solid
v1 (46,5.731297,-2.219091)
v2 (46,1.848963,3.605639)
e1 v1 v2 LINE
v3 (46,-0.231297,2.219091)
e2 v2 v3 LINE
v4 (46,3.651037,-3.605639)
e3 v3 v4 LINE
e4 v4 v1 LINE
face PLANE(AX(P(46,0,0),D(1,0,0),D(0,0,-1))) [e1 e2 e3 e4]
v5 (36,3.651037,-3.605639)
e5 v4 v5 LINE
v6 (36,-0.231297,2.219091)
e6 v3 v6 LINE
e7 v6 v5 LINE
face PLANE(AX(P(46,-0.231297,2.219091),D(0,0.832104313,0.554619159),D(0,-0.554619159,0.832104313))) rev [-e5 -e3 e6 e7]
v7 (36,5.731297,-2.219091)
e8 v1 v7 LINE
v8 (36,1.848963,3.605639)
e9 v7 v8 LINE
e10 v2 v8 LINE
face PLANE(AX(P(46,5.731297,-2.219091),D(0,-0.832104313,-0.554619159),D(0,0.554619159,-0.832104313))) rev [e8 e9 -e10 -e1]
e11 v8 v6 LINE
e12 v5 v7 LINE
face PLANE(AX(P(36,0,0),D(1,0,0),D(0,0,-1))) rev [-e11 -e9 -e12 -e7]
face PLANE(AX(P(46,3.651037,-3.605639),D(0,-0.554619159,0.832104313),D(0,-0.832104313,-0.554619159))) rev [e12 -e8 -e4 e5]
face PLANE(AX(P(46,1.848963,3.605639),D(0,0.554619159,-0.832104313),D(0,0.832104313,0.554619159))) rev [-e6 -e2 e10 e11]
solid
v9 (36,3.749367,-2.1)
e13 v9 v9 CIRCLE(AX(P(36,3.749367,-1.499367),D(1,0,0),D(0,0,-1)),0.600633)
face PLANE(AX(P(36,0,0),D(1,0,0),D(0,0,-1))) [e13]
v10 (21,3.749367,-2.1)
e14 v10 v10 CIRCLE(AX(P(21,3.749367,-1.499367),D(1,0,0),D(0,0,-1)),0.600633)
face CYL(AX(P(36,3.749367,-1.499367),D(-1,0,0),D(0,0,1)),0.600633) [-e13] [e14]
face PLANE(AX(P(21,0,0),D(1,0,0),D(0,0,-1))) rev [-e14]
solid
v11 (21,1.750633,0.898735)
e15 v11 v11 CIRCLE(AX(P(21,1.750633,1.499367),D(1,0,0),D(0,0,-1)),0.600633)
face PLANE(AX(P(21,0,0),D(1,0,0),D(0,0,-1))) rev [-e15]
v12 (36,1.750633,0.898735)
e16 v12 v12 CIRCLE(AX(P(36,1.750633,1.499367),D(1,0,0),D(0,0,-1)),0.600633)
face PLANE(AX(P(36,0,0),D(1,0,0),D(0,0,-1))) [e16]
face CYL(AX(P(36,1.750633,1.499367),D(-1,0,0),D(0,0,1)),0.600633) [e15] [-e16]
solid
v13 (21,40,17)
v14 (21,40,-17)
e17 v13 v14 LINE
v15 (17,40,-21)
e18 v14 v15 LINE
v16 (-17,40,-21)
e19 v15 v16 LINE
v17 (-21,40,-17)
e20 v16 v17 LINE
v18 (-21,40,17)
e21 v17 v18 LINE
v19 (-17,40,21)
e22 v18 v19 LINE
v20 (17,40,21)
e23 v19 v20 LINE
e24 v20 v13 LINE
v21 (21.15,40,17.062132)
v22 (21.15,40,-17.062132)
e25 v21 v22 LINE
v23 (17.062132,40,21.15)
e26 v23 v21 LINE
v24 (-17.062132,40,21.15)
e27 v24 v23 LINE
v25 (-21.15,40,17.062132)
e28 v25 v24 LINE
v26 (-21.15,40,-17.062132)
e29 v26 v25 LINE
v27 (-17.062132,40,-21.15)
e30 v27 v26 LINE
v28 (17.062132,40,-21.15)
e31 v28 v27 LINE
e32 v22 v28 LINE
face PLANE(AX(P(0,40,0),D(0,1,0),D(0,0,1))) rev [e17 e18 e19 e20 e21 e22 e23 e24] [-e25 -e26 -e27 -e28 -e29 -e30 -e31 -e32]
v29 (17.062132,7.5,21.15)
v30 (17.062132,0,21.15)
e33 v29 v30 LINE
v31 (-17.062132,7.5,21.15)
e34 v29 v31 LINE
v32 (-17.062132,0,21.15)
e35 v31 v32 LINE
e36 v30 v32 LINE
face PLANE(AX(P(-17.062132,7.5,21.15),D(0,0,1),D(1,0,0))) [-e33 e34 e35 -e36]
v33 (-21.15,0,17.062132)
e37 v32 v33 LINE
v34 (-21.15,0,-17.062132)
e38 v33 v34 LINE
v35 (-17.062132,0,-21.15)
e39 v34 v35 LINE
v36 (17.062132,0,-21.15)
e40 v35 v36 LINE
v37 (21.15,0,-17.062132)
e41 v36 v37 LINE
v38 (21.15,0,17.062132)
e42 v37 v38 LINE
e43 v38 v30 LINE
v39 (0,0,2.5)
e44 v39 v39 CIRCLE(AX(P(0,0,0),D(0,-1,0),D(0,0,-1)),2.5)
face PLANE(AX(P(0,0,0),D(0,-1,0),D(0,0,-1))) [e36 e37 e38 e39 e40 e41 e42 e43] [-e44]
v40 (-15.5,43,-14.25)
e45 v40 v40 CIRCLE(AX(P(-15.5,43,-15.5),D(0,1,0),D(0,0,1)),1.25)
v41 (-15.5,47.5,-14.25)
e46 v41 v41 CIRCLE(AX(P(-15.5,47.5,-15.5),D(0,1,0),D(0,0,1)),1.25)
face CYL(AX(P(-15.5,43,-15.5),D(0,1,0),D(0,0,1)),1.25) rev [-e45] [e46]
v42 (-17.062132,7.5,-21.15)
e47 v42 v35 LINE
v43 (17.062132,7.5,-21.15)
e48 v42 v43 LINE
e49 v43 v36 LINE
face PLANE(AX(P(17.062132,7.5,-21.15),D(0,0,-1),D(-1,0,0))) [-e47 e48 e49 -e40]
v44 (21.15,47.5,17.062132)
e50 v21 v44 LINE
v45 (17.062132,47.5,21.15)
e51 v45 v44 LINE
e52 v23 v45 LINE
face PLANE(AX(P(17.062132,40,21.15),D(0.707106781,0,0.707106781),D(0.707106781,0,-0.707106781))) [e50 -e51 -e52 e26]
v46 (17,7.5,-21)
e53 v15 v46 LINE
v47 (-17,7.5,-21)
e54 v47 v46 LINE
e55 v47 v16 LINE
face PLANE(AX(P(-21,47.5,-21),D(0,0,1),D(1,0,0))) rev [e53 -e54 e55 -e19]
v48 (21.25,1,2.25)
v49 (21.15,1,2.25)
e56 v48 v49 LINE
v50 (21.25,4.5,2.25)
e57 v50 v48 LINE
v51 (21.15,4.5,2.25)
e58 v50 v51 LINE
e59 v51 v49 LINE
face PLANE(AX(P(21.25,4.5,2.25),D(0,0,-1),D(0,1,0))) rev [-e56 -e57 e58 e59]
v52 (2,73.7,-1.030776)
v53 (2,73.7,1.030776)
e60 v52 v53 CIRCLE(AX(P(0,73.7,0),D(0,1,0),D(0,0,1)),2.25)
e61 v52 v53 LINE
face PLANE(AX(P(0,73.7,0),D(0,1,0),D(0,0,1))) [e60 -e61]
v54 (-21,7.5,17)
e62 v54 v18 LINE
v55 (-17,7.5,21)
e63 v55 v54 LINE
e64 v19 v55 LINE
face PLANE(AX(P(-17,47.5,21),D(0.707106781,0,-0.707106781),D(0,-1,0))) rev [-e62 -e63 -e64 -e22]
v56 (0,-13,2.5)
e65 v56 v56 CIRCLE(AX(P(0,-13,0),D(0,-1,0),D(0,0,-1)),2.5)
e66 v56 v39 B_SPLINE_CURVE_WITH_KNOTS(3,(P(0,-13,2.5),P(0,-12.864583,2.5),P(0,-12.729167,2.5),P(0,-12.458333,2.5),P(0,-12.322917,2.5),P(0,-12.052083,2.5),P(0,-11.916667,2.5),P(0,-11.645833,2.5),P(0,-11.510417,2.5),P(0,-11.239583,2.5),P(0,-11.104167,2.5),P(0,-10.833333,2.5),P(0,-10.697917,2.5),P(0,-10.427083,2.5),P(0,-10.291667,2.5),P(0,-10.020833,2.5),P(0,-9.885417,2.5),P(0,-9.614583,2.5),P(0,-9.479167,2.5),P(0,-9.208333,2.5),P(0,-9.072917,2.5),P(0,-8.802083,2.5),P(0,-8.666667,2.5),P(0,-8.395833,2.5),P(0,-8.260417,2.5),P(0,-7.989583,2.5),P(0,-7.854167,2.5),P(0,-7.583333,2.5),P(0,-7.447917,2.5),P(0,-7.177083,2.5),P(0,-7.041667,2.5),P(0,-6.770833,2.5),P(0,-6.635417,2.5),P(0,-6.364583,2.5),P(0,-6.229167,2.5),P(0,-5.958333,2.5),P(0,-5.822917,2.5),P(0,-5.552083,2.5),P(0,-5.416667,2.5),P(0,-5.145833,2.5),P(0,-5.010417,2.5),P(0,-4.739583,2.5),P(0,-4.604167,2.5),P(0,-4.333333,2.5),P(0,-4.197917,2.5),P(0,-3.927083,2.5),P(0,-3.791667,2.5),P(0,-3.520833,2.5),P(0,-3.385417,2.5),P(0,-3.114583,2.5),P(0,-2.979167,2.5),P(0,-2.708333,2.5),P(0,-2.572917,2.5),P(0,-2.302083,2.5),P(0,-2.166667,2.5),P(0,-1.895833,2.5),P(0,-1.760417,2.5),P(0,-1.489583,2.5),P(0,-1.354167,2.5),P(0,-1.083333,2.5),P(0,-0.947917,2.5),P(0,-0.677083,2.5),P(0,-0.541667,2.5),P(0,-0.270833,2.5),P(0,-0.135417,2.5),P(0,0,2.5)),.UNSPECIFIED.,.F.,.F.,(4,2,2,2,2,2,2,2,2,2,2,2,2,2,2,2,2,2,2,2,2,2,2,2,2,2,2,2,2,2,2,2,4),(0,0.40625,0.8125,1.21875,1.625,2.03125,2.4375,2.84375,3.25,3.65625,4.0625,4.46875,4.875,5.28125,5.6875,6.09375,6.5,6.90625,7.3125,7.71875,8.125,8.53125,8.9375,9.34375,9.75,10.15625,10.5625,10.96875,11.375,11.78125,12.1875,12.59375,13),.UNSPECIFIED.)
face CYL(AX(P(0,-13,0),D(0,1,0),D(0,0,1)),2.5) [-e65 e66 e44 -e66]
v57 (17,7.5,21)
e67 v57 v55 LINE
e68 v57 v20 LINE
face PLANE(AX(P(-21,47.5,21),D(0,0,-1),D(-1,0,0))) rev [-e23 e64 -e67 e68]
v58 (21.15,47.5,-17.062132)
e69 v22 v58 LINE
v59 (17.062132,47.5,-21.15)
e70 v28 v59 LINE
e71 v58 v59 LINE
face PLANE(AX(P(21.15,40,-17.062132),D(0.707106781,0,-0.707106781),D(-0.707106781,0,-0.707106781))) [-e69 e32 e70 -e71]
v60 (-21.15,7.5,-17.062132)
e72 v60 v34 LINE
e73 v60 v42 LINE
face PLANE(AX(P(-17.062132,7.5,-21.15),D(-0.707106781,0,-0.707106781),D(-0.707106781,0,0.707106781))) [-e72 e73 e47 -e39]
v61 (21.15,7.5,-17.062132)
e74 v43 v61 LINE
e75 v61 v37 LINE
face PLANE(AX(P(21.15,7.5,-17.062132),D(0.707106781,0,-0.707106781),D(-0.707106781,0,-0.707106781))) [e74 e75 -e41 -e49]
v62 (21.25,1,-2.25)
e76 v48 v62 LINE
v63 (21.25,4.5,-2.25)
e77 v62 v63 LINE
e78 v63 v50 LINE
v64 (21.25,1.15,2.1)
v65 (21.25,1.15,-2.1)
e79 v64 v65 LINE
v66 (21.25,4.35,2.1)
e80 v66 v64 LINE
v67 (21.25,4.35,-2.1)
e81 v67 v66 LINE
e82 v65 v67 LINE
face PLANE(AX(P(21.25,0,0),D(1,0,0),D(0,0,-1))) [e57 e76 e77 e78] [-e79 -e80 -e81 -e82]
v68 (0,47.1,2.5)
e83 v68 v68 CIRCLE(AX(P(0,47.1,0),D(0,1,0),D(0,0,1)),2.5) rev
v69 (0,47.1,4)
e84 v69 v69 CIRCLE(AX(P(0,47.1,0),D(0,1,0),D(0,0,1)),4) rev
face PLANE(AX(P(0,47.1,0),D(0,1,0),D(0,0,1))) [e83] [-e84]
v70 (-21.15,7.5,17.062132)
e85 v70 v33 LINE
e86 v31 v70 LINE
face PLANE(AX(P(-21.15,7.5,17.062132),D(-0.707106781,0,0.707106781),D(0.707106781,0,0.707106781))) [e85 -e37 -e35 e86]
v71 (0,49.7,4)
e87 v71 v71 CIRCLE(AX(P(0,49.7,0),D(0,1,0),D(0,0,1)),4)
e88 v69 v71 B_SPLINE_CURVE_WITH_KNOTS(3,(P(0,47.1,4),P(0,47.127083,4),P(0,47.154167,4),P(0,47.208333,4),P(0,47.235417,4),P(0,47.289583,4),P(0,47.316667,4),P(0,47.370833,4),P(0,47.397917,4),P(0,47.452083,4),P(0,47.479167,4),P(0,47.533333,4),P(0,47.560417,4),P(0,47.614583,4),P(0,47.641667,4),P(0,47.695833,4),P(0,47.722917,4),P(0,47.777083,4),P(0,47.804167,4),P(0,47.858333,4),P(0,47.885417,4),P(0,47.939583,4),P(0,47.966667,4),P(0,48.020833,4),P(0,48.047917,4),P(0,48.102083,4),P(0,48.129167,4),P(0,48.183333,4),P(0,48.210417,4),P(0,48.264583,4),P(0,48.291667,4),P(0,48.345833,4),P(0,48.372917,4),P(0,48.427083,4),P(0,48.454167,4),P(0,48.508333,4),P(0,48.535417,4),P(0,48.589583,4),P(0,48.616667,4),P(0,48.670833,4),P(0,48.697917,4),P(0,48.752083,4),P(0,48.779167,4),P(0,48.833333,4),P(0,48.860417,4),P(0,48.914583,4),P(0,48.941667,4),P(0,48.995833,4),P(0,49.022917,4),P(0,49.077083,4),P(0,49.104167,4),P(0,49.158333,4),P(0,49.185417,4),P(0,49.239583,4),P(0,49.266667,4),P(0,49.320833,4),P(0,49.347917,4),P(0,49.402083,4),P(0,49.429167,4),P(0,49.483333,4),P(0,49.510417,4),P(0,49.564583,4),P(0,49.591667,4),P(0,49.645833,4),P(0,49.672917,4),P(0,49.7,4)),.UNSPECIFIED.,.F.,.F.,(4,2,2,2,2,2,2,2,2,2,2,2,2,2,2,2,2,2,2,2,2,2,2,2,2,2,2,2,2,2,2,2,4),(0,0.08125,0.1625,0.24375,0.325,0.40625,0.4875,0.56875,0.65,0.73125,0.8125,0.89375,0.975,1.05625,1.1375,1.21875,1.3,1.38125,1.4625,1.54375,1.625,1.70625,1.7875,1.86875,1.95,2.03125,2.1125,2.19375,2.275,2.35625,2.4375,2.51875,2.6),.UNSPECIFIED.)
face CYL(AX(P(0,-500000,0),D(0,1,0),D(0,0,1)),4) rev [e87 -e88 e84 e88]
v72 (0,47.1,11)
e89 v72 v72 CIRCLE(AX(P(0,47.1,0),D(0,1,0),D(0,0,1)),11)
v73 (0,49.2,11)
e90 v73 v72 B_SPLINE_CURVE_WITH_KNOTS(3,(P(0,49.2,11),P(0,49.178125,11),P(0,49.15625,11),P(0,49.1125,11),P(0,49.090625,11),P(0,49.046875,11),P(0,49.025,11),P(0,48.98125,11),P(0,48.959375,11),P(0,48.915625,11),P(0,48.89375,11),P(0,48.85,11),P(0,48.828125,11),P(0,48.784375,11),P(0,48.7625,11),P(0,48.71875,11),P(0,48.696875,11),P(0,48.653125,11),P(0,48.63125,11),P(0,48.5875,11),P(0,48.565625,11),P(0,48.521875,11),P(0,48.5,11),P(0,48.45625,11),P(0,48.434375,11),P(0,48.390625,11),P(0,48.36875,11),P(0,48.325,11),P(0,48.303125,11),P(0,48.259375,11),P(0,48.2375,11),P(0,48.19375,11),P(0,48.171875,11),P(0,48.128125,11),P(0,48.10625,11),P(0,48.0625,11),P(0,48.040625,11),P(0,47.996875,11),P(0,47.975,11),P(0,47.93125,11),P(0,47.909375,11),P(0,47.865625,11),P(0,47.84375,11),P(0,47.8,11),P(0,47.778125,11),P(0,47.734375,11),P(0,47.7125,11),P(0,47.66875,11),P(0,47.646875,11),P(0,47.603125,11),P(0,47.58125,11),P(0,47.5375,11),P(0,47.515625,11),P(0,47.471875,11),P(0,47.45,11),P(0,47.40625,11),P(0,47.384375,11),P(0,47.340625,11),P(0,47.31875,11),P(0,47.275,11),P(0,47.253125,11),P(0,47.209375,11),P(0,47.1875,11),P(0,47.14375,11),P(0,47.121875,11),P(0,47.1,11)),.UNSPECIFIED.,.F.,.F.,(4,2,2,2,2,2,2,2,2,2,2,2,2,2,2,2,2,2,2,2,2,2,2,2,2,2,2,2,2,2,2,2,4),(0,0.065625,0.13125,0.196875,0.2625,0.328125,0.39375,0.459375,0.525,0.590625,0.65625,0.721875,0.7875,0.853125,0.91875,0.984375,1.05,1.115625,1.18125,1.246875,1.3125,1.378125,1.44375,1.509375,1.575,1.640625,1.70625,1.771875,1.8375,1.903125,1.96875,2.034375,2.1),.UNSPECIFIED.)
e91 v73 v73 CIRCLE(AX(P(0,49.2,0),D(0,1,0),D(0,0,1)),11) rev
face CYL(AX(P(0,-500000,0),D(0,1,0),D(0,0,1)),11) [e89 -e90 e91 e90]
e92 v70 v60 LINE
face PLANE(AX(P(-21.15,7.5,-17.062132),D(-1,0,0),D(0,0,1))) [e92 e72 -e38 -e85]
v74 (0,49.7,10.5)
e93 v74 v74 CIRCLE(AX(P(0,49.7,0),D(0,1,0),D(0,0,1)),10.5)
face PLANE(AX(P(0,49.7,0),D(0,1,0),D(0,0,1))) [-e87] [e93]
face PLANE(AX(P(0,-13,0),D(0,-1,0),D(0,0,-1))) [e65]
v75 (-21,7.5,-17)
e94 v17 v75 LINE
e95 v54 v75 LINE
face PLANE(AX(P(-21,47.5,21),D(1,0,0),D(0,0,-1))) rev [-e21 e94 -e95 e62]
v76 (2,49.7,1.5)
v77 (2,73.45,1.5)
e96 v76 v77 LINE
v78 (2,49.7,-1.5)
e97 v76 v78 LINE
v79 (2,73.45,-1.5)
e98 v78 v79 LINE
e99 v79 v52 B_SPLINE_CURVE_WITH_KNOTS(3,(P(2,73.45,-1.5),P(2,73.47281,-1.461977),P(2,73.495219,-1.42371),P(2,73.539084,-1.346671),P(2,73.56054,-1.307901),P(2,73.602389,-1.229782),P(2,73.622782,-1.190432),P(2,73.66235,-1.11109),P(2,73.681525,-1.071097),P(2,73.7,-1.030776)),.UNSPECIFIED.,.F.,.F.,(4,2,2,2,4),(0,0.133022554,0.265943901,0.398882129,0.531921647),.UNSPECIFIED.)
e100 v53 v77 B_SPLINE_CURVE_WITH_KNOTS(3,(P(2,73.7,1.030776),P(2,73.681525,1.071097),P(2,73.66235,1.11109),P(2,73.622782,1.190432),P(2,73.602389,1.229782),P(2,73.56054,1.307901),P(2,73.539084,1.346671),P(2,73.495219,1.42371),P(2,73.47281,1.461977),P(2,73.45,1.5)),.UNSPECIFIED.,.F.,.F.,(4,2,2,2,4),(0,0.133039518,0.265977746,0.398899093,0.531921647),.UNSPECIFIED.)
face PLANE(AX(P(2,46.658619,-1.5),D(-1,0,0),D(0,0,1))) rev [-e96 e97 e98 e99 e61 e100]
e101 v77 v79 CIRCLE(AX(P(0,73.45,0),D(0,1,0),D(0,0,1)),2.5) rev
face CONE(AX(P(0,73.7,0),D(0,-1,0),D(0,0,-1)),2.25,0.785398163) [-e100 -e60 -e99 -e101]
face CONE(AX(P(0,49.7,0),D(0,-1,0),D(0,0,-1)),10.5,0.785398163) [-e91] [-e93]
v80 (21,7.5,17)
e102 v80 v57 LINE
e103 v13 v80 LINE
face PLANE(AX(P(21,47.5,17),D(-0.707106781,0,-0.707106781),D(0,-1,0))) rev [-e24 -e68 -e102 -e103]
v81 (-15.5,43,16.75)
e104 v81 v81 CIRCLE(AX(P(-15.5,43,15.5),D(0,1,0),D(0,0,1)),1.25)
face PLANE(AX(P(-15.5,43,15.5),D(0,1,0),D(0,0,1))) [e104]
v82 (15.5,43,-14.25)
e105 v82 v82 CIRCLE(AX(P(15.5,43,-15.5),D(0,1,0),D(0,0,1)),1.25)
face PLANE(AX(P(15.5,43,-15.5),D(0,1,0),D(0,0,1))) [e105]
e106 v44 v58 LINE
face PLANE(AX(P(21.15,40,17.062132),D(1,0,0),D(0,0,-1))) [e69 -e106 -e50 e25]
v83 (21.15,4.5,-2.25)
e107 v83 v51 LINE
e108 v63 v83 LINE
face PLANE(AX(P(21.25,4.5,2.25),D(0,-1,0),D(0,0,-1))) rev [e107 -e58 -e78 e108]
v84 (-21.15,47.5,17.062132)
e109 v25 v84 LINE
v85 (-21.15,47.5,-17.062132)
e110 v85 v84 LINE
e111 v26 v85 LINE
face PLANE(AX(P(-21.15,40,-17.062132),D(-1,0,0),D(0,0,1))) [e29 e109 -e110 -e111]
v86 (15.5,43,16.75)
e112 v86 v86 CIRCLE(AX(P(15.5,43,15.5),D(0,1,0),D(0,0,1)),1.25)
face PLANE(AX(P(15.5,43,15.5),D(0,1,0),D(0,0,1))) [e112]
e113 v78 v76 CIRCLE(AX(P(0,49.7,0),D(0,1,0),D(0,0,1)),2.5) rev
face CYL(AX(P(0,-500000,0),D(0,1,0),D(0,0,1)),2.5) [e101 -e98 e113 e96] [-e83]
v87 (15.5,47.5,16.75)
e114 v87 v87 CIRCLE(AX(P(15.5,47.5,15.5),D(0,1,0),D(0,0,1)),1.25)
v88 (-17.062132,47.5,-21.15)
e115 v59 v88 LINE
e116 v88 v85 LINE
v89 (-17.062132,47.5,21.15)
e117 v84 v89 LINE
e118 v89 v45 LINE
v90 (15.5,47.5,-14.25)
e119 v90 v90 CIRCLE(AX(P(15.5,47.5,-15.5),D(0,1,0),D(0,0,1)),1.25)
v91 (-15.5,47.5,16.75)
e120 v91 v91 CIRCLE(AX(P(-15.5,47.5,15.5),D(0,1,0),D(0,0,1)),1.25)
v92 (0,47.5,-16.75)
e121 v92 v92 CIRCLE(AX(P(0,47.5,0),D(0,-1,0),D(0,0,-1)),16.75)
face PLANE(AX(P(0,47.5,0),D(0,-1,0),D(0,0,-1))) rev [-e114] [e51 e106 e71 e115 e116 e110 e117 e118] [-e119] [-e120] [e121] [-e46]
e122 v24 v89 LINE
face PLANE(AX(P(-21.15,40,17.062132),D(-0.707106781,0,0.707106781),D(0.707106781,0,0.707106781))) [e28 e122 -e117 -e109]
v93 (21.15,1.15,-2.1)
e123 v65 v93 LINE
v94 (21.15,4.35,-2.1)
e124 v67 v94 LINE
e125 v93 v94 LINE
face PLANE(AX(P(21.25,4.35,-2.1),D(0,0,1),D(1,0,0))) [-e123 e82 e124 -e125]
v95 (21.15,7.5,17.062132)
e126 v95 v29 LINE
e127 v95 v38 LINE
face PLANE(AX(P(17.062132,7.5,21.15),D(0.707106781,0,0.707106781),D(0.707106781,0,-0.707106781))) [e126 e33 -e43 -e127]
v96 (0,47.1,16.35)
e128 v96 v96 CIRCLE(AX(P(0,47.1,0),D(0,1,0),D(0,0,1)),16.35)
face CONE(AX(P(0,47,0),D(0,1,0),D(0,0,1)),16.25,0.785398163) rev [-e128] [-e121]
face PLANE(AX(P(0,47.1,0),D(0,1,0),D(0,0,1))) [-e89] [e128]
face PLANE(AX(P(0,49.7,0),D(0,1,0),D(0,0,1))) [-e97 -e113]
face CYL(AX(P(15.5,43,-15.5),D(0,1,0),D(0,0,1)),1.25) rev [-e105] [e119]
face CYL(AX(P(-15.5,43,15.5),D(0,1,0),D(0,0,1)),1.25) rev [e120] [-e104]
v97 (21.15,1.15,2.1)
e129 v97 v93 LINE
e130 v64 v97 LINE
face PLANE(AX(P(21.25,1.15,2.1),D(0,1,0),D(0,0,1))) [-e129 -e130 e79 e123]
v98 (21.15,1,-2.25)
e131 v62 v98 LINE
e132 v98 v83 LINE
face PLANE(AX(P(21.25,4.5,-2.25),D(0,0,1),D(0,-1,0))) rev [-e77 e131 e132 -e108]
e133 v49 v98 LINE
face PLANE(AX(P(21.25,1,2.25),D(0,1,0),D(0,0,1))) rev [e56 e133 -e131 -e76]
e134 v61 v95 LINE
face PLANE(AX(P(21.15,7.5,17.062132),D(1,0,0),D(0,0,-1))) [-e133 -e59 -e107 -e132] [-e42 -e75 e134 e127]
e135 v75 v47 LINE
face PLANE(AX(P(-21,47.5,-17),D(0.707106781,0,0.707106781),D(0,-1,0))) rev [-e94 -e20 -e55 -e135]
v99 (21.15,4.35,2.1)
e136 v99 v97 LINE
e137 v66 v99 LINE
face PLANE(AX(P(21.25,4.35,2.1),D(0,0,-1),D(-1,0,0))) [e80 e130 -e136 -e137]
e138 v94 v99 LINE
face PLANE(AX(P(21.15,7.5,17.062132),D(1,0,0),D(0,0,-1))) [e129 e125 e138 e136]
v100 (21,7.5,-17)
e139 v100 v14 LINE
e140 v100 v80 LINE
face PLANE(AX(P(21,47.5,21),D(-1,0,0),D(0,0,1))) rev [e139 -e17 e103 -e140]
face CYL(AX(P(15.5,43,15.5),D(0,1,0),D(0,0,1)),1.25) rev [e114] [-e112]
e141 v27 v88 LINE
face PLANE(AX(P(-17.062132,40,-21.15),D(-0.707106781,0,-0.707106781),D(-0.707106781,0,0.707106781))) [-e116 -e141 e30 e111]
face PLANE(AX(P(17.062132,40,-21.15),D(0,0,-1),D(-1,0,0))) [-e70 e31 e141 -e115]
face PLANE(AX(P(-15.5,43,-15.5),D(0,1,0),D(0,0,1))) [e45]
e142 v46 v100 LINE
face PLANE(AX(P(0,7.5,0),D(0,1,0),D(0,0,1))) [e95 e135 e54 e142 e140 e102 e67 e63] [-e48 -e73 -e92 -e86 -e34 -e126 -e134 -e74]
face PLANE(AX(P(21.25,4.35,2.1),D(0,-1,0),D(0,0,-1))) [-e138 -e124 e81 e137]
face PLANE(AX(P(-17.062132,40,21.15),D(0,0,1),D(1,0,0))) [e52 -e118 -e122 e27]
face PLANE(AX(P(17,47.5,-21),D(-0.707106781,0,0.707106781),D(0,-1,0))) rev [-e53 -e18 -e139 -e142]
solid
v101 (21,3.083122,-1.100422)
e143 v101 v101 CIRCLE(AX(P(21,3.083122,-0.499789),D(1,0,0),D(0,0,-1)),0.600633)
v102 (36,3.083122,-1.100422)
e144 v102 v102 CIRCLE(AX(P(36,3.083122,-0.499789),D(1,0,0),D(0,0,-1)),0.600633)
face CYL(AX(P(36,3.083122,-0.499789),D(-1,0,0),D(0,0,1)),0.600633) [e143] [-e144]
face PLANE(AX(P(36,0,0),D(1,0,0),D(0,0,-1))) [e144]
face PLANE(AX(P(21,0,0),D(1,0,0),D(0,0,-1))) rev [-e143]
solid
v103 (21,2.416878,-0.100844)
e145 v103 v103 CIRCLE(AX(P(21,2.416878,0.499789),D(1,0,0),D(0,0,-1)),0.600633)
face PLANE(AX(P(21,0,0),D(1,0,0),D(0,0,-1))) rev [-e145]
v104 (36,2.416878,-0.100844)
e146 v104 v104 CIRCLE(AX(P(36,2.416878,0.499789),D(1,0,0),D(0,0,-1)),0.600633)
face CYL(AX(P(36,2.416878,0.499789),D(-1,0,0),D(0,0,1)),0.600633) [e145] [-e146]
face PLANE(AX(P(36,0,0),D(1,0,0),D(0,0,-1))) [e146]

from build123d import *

# Parameters (mm, degrees)
CROQUIS1_W                          = 42
CROQUIS1_H                          = 42
SALIENTE_EXTRUIR1_DEPTH             = 47.5
CHAFL_N1_SIZE                       = 4
CROQUIS3_R                          = 16.25
CORTAR_EXTRUIR1_DEPTH               = 0.4
SALIENTE_EXTRUIR2_REACH             = 59.897
CROQUIS4_R                          = 11
CROQUIS4_R_2                        = 4
CHAFL_N2_SIZE                       = 0.5
CROQUIS5_R                          = 2.5
SALIENTE_EXTRUIR3_DEPTH             = 24
SALIENTE_EXTRUIR3_DIRECTION_2_REACH = 59.897
CORTAR_EXTRUIR2_DEPTH               = 24
CHAFL_N3_SIZE                       = 0.25
SALIENTE_EXTRUIR9_DEPTH             = 7.5
SALIENTE_EXTRUIR10_DEPTH            = 7.5
CROQUIS7_R                          = 1.25
CORTAR_EXTRUIR3_DEPTH               = 4.5
CROQUIS10_W                         = 4.5
CROQUIS10_H                         = 3.5
CROQUIS10_W_2                       = 4.2
CROQUIS10_H_2                       = 3.2
SALIENTE_EXTRUIR7_DEPTH             = 0.1
CROQUIS11_R                         = 0.600632734
SALIENTE_EXTRUIR8_DEPTH             = 15
SALIENTE_EXTRUIR8_2_DEPTH           = 15
SALIENTE_EXTRUIR8_3_DEPTH           = 15
SALIENTE_EXTRUIR8_4_DEPTH           = 15
SALIENTE_EXTRUIR11_DEPTH            = 10
CROQUIS15_R                         = 2.5
SALIENTE_EXTRUIR12_DEPTH            = 13


with BuildPart() as part:
    # Croquis1 → Saliente-Extruir1 (new body)
    with BuildSketch(Plane(origin=(0, 0, 0), x_dir=(1, 0, 0), z_dir=(0, 1, 0))):
        Rectangle(CROQUIS1_W, CROQUIS1_H)
    extrude(amount=SALIENTE_EXTRUIR1_DEPTH)

    # Chaflán1
    chafl_n1_edges = [part.edges().sort_by_distance(p)[0] for p in [
        (-21, 23.75, -21),
        (21, 23.75, -21),
        (21, 23.75, 21),
        (-21, 23.75, 21),
    ]]
    chamfer(chafl_n1_edges, length=CHAFL_N1_SIZE)

    # Croquis3 → Cortar-Extruir1 (cut)
    with BuildSketch(Plane(origin=(0, 47.5, 0), x_dir=(1, 0, 0), z_dir=(0, 1, 0))):
        with Locations(Location((0, 0, 0), (0, 0, 270))):
            Circle(CROQUIS3_R)
    extrude(amount=-CORTAR_EXTRUIR1_DEPTH, mode=Mode.SUBTRACT)

    # Croquis4 → Saliente-Extruir2 (add, up to next)
    with BuildSketch(Plane(origin=(0, 49.7, 0), x_dir=(1, 0, 0), z_dir=(0, 1, 0)), mode=Mode.PRIVATE) as saliente_extruir2_sk1:
        with Locations(Location((0, 0, 0), (0, 0, 270))):
            Circle(CROQUIS4_R)
        with Locations(Location((0, 0, 0), (0, 0, 270))):
            Circle(CROQUIS4_R_2, mode=Mode.SUBTRACT)
    saliente_extruir2_tool1 = extrude(saliente_extruir2_sk1.sketch, amount=-SALIENTE_EXTRUIR2_REACH, mode=Mode.PRIVATE) - part.part
    add(saliente_extruir2_tool1.solids().sort_by_distance((0, 49.7, -10.688873))[0])

    # Chaflán2
    # the kernel refuses this chamfer: 0.5 mm, written as the material it takes off along each edge
    with BuildSketch(Plane(origin=(0, 47.5, 0), x_dir=(0, 0, 1), z_dir=(-1, 0, 0))) as chafl_n2_piece_1_section:
        Polygon((16.25 + CHAFL_N2_SIZE, 0), (16.25, -CHAFL_N2_SIZE), (16.25, 0), align=None)
    chafl_n2_piece_1 = revolve(axis=Axis((0, 47.5, 0), (0, 1, 0)), mode=Mode.PRIVATE)
    chafl_n2_piece_1 = split(chafl_n2_piece_1, bisect_by=Plane(origin=(0, 47.1, -16.540253215), z_dir=(0, 1, 0)), keep=Keep.TOP, mode=Mode.PRIVATE)
    add(chafl_n2_piece_1, mode=Mode.SUBTRACT)
    with BuildSketch(Plane(origin=(0, 49.7, 0), x_dir=(0, 0, 1), z_dir=(-1, 0, 0))) as chafl_n2_piece_2:
        Polygon((11, -CHAFL_N2_SIZE), (11 - CHAFL_N2_SIZE, 0), (11, 0), align=None)
    revolve(axis=Axis((0, 49.7, 0), (0, 1, 0)), mode=Mode.SUBTRACT)


with BuildPart() as body_2:
    # Croquis5 → Saliente-Extruir3 (new body)
    with BuildSketch(Plane(origin=(0, 49.7, 0), x_dir=(1, 0, 0), z_dir=(0, 1, 0))):
        with Locations(Location((0, 0, 0), (0, 0, 270))):
            Circle(CROQUIS5_R)
    extrude(amount=SALIENTE_EXTRUIR3_DEPTH)


    # Croquis5 → Saliente-Extruir3 direction 2 (add, up to next)
    with BuildSketch(Plane(origin=(0, 49.7, 0), x_dir=(1, 0, 0), z_dir=(0, 1, 0)), mode=Mode.PRIVATE) as saliente_extruir3_direction_2_sk1:
        with Locations(Location((0, 0, 0), (0, 0, 270))):
            Circle(CROQUIS5_R)
    saliente_extruir3_direction_2_tool1 = extrude(saliente_extruir3_direction_2_sk1.sketch, amount=-SALIENTE_EXTRUIR3_DIRECTION_2_REACH, mode=Mode.PRIVATE) - part.part
    add(saliente_extruir3_direction_2_tool1.solids().sort_by_distance((0, 49.7, 0))[0])

    # Croquis6 → Cortar-Extruir2 (cut)
    with BuildSketch(Plane(origin=(0, 73.7, 0), x_dir=(1, 0, 0), z_dir=(0, 1, 0))):
        with BuildLine():
            Line((2, 1.5), (2, -1.5))
            ThreePointArc((2, -1.5), (2.5, 0), (2, 1.5))
        make_face()
    extrude(amount=-CORTAR_EXTRUIR2_DEPTH, mode=Mode.SUBTRACT)

    # Chaflán3
    chafl_n3_edges = [body_2.edges().sort_by_distance(p)[0] for p in [
        (-2.236067977, 73.7, -1.118033989),
    ]]
    chamfer(chafl_n3_edges, length=CHAFL_N3_SIZE)


    add(part.part)  # Saliente-Extruir9 merges part
    # Croquis12 → Saliente-Extruir9 (add)
    with BuildSketch(Plane(origin=(0, 47.5, 0), x_dir=(1, 0, 0), z_dir=(0, 1, 0))):
        Polygon((-17.062132034, 21.15), (-21.15, 17.062132034), (-21.15, -17.062132034), (-17.062132034, -21.15), (17.062132034, -21.15), (21.15, -17.062132034), (21.15, 17.062132034), (17.062132034, 21.15), align=None)
        Polygon((-17, 21), (-21, 17), (-21, -17), (-17, -21), (17, -21), (21, -17), (21, 17), (17, 21), align=None, mode=Mode.SUBTRACT)
    extrude(amount=-SALIENTE_EXTRUIR9_DEPTH)

    # Croquis13 → Saliente-Extruir10 (add)
    with BuildSketch(Plane.XZ):
        Polygon((-17.062132034, -21.15), (-21.15, -17.062132034), (-21.15, 17.062132034), (-17.062132034, 21.15), (17.062132034, 21.15), (21.15, 17.062132034), (21.15, -17.062132034), (17.062132034, -21.15), align=None)
        Polygon((-17, -21), (-21, -17), (-21, 17), (-17, 21), (17, 21), (21, 17), (21, -17), (17, -21), align=None, mode=Mode.SUBTRACT)
    extrude(amount=-SALIENTE_EXTRUIR10_DEPTH)

    # Croquis7 → Cortar-Extruir3 (cut)
    with BuildSketch(Plane(origin=(0, 47.5, 0), x_dir=(1, 0, 0), z_dir=(0, 1, 0))):
        with Locations(Location((-15.5, 15.5, 0), (0, 0, 270))):
            Circle(CROQUIS7_R)
        with Locations(Location((15.5, 15.5, 0), (0, 0, 270))):
            Circle(CROQUIS7_R)
        with Locations(Location((15.5, -15.5, 0), (0, 0, 270))):
            Circle(CROQUIS7_R)
        with Locations(Location((-15.5, -15.5, 0), (0, 0, 270))):
            Circle(CROQUIS7_R)
    extrude(amount=-CORTAR_EXTRUIR3_DEPTH, mode=Mode.SUBTRACT)

    # Croquis10 → Saliente-Extruir7 (add)
    with BuildSketch(Plane(origin=(21.15, 0, 0), x_dir=(0, 0, -1), z_dir=(1, 0, 0))):
        with Locations((0, 2.75)):
            Rectangle(CROQUIS10_W, CROQUIS10_H)
        with Locations((0, 2.75)):
            Rectangle(CROQUIS10_W_2, CROQUIS10_H_2, mode=Mode.SUBTRACT)
    extrude(amount=SALIENTE_EXTRUIR7_DEPTH)

    # Croquis15 → Saliente-Extruir12 (add)
    with BuildSketch(Plane.XZ):
        with Locations(Location((0, 0, 0), (0, 0, 90))):
            Circle(CROQUIS15_R)
    extrude(amount=SALIENTE_EXTRUIR12_DEPTH)


with BuildPart() as body_2_2:
    # Croquis11 → Saliente-Extruir8 (new body)
    with BuildSketch(Plane(origin=(21, 0, 0), x_dir=(0, 0, -1), z_dir=(1, 0, 0))):
        with Locations((-1.499367266, 1.750632734)):
            Circle(CROQUIS11_R)
    extrude(amount=SALIENTE_EXTRUIR8_DEPTH)


with BuildPart() as body_3:
    # Croquis11 → Saliente-Extruir8 2 (new body)
    with BuildSketch(Plane(origin=(21, 0, 0), x_dir=(0, 0, -1), z_dir=(1, 0, 0))):
        with Locations((-0.499789089, 2.416877578)):
            Circle(CROQUIS11_R)
    extrude(amount=SALIENTE_EXTRUIR8_2_DEPTH)


with BuildPart() as body_4:
    # Croquis11 → Saliente-Extruir8 3 (new body)
    with BuildSketch(Plane(origin=(21, 0, 0), x_dir=(0, 0, -1), z_dir=(1, 0, 0))):
        with Locations((0.499789089, 3.083122422)):
            Circle(CROQUIS11_R)
    extrude(amount=SALIENTE_EXTRUIR8_3_DEPTH)


with BuildPart() as body_5:
    # Croquis11 → Saliente-Extruir8 4 (new body)
    with BuildSketch(Plane(origin=(21, 0, 0), x_dir=(0, 0, -1), z_dir=(1, 0, 0))):
        with Locations((1.499367266, 3.749367266)):
            Circle(CROQUIS11_R)
    extrude(amount=SALIENTE_EXTRUIR8_4_DEPTH)


with BuildPart() as body_6:
    # Croquis14 → Saliente-Extruir11 (new body)
    with BuildSketch(Plane(origin=(36, 0, 0), x_dir=(0, 0, -1), z_dir=(1, 0, 0))):
        Polygon((-2.219091147, -0.231297449), (3.605639046, 3.651036666), (2.219091147, 5.731297449), (-3.605639046, 1.848963334), align=None)
    extrude(amount=SALIENTE_EXTRUIR11_DEPTH)


solid = Compound([body_2.part, body_2_2.part, body_3.part, body_4.part, body_5.part, body_6.part])
